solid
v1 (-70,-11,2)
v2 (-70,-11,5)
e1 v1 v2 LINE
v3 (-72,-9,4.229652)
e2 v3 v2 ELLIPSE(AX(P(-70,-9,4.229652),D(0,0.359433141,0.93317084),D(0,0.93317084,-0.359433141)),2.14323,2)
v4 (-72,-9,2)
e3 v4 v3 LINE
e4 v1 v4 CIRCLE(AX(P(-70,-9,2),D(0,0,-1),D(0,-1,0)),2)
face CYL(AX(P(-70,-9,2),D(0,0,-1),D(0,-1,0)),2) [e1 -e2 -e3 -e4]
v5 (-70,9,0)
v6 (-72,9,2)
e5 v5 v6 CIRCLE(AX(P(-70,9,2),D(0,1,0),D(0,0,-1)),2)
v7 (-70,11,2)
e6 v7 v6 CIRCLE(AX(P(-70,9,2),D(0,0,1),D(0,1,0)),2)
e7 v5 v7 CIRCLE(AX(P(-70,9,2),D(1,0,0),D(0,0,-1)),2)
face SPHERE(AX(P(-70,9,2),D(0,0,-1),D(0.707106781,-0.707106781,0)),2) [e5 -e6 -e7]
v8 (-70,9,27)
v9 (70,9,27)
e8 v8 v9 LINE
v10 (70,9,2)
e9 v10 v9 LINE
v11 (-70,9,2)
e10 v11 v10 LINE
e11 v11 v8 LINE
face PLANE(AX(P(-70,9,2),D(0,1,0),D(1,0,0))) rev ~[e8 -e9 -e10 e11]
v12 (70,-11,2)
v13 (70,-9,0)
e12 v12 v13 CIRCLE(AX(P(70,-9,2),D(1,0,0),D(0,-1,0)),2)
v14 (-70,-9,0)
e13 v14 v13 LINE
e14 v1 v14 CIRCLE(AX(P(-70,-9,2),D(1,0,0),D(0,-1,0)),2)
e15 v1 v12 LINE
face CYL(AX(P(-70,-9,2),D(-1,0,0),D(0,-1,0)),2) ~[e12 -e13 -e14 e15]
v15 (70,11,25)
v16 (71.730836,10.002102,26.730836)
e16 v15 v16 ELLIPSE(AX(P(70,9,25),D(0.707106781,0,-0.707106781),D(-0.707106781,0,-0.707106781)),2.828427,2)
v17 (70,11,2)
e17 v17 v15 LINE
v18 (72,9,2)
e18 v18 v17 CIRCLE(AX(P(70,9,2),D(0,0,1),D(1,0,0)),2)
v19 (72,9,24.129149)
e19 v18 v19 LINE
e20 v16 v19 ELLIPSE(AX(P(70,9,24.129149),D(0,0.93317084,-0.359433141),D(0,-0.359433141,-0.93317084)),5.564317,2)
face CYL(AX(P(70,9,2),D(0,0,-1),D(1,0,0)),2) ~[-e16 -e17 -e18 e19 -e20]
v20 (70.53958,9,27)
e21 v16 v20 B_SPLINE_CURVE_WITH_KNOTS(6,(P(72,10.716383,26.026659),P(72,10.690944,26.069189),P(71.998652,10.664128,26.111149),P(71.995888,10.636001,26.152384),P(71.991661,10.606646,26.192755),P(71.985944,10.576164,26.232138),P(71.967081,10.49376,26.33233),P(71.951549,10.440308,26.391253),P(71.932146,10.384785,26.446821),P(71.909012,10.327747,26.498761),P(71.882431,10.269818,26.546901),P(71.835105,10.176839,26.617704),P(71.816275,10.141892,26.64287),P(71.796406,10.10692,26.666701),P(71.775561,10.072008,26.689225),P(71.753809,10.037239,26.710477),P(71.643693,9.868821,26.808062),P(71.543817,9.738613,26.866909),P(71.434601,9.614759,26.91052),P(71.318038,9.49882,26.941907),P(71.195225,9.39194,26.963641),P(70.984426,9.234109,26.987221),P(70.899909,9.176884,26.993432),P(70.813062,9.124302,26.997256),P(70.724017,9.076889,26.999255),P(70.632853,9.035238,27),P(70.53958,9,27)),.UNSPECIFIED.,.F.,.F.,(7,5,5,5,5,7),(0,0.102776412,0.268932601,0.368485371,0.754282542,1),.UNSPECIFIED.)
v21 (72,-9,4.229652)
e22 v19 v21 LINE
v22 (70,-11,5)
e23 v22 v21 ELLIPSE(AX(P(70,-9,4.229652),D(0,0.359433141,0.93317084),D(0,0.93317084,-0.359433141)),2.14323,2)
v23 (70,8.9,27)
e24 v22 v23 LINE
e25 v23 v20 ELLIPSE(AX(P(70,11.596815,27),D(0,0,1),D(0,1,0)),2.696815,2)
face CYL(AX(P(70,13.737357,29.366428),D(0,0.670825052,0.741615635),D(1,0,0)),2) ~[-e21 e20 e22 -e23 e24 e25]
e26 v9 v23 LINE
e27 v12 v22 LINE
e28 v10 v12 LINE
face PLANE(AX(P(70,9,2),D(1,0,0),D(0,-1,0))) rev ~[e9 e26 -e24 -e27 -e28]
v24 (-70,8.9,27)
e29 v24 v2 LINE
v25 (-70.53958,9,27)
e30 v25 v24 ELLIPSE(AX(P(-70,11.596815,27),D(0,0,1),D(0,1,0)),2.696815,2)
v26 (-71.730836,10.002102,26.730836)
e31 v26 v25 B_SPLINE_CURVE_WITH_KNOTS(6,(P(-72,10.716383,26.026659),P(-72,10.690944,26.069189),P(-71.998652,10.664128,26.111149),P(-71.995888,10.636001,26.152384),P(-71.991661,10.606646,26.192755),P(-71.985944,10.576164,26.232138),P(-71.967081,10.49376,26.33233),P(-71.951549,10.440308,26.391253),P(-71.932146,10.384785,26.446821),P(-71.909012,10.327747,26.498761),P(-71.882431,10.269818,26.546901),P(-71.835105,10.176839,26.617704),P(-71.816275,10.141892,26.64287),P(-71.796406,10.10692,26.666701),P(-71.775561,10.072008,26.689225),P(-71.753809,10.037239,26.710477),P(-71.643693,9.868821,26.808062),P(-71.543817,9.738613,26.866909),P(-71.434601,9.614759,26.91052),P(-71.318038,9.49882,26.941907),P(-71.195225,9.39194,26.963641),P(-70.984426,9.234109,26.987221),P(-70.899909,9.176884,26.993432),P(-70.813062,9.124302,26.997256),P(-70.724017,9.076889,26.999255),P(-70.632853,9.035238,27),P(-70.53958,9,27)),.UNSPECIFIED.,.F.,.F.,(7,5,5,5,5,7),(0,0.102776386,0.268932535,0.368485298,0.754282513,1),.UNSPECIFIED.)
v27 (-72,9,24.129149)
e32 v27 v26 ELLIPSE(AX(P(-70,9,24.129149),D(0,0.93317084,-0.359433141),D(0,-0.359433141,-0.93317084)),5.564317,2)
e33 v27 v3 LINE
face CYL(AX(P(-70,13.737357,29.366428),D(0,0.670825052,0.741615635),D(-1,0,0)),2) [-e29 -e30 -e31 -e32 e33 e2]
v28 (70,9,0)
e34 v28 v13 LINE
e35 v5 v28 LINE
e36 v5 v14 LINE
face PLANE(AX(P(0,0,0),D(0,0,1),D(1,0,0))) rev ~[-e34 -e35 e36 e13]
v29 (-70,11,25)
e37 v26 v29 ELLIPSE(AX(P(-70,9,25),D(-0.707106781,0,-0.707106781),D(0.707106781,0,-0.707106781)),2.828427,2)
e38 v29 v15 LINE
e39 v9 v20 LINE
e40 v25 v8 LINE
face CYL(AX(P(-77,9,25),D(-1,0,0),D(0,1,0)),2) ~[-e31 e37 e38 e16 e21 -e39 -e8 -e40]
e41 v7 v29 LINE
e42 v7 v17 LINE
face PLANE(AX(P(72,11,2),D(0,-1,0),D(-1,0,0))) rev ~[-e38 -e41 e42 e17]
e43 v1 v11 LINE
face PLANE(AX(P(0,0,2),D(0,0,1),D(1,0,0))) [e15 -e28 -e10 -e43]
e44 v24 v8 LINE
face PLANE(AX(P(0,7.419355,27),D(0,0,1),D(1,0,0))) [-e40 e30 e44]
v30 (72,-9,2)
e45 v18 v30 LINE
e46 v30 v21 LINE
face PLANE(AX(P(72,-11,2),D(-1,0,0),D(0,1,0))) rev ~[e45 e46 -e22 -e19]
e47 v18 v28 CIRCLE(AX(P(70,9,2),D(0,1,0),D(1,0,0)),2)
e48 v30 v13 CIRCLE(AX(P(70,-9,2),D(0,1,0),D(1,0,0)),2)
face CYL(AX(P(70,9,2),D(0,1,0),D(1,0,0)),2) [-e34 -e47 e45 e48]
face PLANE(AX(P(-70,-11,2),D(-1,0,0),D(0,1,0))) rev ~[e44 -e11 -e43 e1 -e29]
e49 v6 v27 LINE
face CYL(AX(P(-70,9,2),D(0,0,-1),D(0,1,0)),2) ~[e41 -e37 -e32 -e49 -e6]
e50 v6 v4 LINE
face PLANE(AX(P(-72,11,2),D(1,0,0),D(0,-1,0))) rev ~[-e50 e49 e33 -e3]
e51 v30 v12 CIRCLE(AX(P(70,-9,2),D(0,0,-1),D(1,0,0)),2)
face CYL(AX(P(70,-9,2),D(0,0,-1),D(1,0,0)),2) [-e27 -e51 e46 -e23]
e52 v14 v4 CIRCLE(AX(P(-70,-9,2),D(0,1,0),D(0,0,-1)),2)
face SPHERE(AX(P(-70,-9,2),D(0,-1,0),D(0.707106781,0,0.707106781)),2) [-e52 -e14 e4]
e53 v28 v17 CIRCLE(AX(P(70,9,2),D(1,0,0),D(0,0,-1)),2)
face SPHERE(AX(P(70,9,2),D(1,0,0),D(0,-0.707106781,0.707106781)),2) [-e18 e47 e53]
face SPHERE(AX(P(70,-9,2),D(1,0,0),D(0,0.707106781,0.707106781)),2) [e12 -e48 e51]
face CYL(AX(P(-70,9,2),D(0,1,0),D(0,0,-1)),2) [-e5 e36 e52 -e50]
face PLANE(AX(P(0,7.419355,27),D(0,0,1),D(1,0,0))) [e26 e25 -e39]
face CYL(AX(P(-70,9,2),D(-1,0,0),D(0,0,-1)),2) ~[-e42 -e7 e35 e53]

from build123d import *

# Parameters (mm, degrees)
F0_W         = 144
F0_H         = 22
F1_DEPTH     = 2
F3_DEPTH     = 25
F5_DEPTH     = 160
F6_T1_DEPTH  = 18
F6_T3_DEPTH  = 140
F6_T5_DEPTH  = 30
F6_T7_DEPTH  = 39.6649624979
F6_T9_DEPTH  = 8
F6_T11_DEPTH = 154
F6_S15_W     = 2
F6_S15_H     = 2
F6_T16_DEPTH = 2
F6_S21_W     = 2
F6_S21_H     = 2
F6_T22_DEPTH = 2
F6_S27_W     = 2
F6_S27_H     = 2
F6_T28_DEPTH = 2
F6_S33_W     = 2
F6_S33_H     = 2
F6_T34_DEPTH = 2


# Not quite as in the source:
# - a fillet or chamfer that OpenCascade refuses, or shapes differently, is made with other operations: its cross-section is extruded or revolved along the edge and cut away or added


with BuildPart() as f1:
    # F0 (on Top) → F1 (new body)
    with BuildSketch(Plane.XY):
        Rectangle(F0_W, F0_H)
    extrude(amount=F1_DEPTH)

    # F2 (on face) → F3 (join)
    with BuildSketch(Plane.XY.offset(2)):
        Polygon((-70.000000298, -11), (-70.000000298, 9.000000298), (70.000000298, 9.000000298), (70.000000298, -11), (72, -11), (72, 11), (-72, 11), (-72, -11), align=None)
    extrude(amount=F3_DEPTH)

    # F4 (on face) → F5 (cut)
    with BuildSketch(Plane(origin=(-72, 0, 0), x_dir=(0, -1, 0), z_dir=(-1, 0, 0))):
        Polygon((11, 27), (-8.9, 27), (11, 5), align=None)
    extrude(amount=-F5_DEPTH, mode=Mode.SUBTRACT)

    # F6: fillet of radius 2 on 11 edges, made by hand

    # F6_s2 → F6_t1 (cut)
    with BuildSketch(Plane.XZ.offset(-9)):
        with BuildLine():
            ThreePointArc((72, 2), (71.4142135624, 0.5857864376), (70, 0))
            Line((70, 0), (72, 0))
            Line((72, 0), (72, 2))
        make_face()
        with BuildLine():
            ThreePointArc((-70, 0), (-71.4142135624, 0.5857864376), (-72, 2))
            Line((-72, 2), (-72, 0))
            Line((-72, 0), (-70, 0))
        make_face()
    extrude(amount=F6_T1_DEPTH, mode=Mode.SUBTRACT)

    # F6_s4 → F6_t3 (cut)
    with BuildSketch(Plane.YZ.offset(-70)):
        with BuildLine():
            ThreePointArc((9, 0), (10.4142135624, 0.5857864376), (11, 2))
            Line((11, 2), (11, 0))
            Line((11, 0), (9, 0))
        make_face()
        with BuildLine():
            ThreePointArc((-11, 2), (-10.4142135624, 0.5857864376), (-9, 0))
            Line((-9, 0), (-11, 0))
            Line((-11, 0), (-11, 2))
        make_face()
    extrude(amount=F6_T3_DEPTH, mode=Mode.SUBTRACT)

    # F6_s6 → F6_t5 (cut)
    with BuildSketch(Plane.XY.offset(2)):
        with BuildLine():
            ThreePointArc((-70, 11), (-71.4142135624, 10.4142135624), (-72, 9))
            Line((-72, 9), (-72, 11))
            Line((-72, 11), (-70, 11))
        make_face()
        with BuildLine():
            ThreePointArc((72, 9), (71.4142135624, 10.4142135624), (70, 11))
            Line((70, 11), (72, 11))
            Line((72, 11), (72, 9))
        make_face()
    extrude(amount=F6_T5_DEPTH, mode=Mode.SUBTRACT)

    # F6_s8 → F6_t7 (cut)
    with BuildSketch(Plane(origin=(0, 20.7915282423, 22.9856091121), x_dir=(1, 0, 0), z_dir=(0, -0.6708250517, -0.741615635))):
        with BuildLine():
            ThreePointArc((72, 9.5118972432), (71.4142135624, 10.9261108056), (70, 11.5118972432))
            Line((70, 11.5118972432), (72, 11.5118972432))
            Line((72, 11.5118972432), (72, 9.5118972432))
        make_face()
        with BuildLine():
            ThreePointArc((-72, 9.5118972432), (-71.4142135624, 10.9261108056), (-70, 11.5118972432))
            Line((-70, 11.5118972432), (-72, 11.5118972432))
            Line((-72, 11.5118972432), (-72, 9.5118972432))
        make_face()
    extrude(amount=F6_T7_DEPTH, mode=Mode.SUBTRACT)

    # F6_s10 → F6_t9 (cut)
    with BuildSketch(Plane.XY.offset(2)):
        with BuildLine():
            ThreePointArc((-70, -11), (-71.4142135624, -10.4142135624), (-72, -9))
            Line((-72, -9), (-72, -11))
            Line((-72, -11), (-70, -11))
        make_face()
        with BuildLine():
            ThreePointArc((72, -9), (71.4142135624, -10.4142135624), (70, -11))
            Line((70, -11), (72, -11))
            Line((72, -11), (72, -9))
        make_face()
    extrude(amount=F6_T9_DEPTH, mode=Mode.SUBTRACT)

    # F6_s12 → F6_t11 (cut)
    with BuildSketch(Plane.YZ.offset(-77)):
        with BuildLine():
            ThreePointArc((11, 25), (10.4142135624, 26.4142135624), (9, 27))
            Line((9, 27), (11, 27))
            Line((11, 27), (11, 25))
        make_face()
    extrude(amount=F6_T11_DEPTH, mode=Mode.SUBTRACT)


with BuildPart() as f6_tool14:
    # F6_s15 → F6_t16 (new body)
    with BuildSketch(Plane.YZ.offset(70)):
        with Locations((-10, 1)):
            Rectangle(F6_S15_W, F6_S15_H)
    extrude(amount=F6_T16_DEPTH)

    # F6_s17 → F6_t18 (revolve, cut)
    with BuildSketch(Plane(origin=(70, -9, 2), x_dir=(0, 0.7071067812, 0.7071067812), z_dir=(0, 0.7071067812, -0.7071067812))):
        with BuildLine():
            ThreePointArc((0, -2), (2, 0), (0, 2))
            Line((0, 2), (0, -2))
        make_face()
    revolve(axis=Axis((70, -9, 2), (1, 0, 0)), mode=Mode.SUBTRACT)


with BuildPart() as f1_1:
    add(f1.part)

    # F6_t13: cut F6_tool14
    add(f6_tool14.part, mode=Mode.SUBTRACT)


with BuildPart() as f6_tool20:
    # F6_s21 → F6_t22 (new body)
    with BuildSketch(Plane.YZ.offset(70)):
        with Locations((10, 1)):
            Rectangle(F6_S21_W, F6_S21_H)
    extrude(amount=F6_T22_DEPTH)

    # F6_s23 → F6_t24 (revolve, cut)
    with BuildSketch(Plane(origin=(70, 9, 2), x_dir=(0, -0.7071067812, 0.7071067812), z_dir=(0, 0.7071067812, 0.7071067812))):
        with BuildLine():
            ThreePointArc((0, -2), (2, 0), (0, 2))
            Line((0, 2), (0, -2))
        make_face()
    revolve(axis=Axis((70, 9, 2), (1, 0, 0)), mode=Mode.SUBTRACT)


with BuildPart() as f1_2:
    add(f1_1.part)

    # F6_t19: cut F6_tool20
    add(f6_tool20.part, mode=Mode.SUBTRACT)


with BuildPart() as f6_tool26:
    # F6_s27 → F6_t28 (new body)
    with BuildSketch(Plane.XY.offset(2)):
        with Locations((-71, 10)):
            Rectangle(F6_S27_W, F6_S27_H)
    extrude(amount=-F6_T28_DEPTH)

    # F6_s29 → F6_t30 (revolve, cut)
    with BuildSketch(Plane(origin=(-70, 9, 2), x_dir=(0.7071067812, -0.7071067812, 0), z_dir=(0.7071067812, 0.7071067812, 0))):
        with BuildLine():
            ThreePointArc((0, -2), (2, 0), (0, 2))
            Line((0, 2), (0, -2))
        make_face()
    revolve(axis=Axis((-70, 9, 2), (0, 0, -1)), mode=Mode.SUBTRACT)


with BuildPart() as f1_3:
    add(f1_2.part)

    # F6_t25: cut F6_tool26
    add(f6_tool26.part, mode=Mode.SUBTRACT)


with BuildPart() as f6_tool32:
    # F6_s33 → F6_t34 (new body)
    with BuildSketch(Plane.XZ.offset(9)):
        with Locations((-71, 1)):
            Rectangle(F6_S33_W, F6_S33_H)
    extrude(amount=F6_T34_DEPTH)

    # F6_s35 → F6_t36 (revolve, cut)
    with BuildSketch(Plane(origin=(-70, -9, 2), x_dir=(0.7071067812, 0, 0.7071067812), z_dir=(0.7071067812, 0, -0.7071067812))):
        with BuildLine():
            ThreePointArc((0, -2), (2, 0), (0, 2))
            Line((0, 2), (0, -2))
        make_face()
    revolve(axis=Axis((-70, -9, 2), (0, -1, 0)), mode=Mode.SUBTRACT)


with BuildPart() as f1_4:
    add(f1_3.part)

    # F6_t31: cut F6_tool32
    add(f6_tool32.part, mode=Mode.SUBTRACT)


solid = f1_4.part
